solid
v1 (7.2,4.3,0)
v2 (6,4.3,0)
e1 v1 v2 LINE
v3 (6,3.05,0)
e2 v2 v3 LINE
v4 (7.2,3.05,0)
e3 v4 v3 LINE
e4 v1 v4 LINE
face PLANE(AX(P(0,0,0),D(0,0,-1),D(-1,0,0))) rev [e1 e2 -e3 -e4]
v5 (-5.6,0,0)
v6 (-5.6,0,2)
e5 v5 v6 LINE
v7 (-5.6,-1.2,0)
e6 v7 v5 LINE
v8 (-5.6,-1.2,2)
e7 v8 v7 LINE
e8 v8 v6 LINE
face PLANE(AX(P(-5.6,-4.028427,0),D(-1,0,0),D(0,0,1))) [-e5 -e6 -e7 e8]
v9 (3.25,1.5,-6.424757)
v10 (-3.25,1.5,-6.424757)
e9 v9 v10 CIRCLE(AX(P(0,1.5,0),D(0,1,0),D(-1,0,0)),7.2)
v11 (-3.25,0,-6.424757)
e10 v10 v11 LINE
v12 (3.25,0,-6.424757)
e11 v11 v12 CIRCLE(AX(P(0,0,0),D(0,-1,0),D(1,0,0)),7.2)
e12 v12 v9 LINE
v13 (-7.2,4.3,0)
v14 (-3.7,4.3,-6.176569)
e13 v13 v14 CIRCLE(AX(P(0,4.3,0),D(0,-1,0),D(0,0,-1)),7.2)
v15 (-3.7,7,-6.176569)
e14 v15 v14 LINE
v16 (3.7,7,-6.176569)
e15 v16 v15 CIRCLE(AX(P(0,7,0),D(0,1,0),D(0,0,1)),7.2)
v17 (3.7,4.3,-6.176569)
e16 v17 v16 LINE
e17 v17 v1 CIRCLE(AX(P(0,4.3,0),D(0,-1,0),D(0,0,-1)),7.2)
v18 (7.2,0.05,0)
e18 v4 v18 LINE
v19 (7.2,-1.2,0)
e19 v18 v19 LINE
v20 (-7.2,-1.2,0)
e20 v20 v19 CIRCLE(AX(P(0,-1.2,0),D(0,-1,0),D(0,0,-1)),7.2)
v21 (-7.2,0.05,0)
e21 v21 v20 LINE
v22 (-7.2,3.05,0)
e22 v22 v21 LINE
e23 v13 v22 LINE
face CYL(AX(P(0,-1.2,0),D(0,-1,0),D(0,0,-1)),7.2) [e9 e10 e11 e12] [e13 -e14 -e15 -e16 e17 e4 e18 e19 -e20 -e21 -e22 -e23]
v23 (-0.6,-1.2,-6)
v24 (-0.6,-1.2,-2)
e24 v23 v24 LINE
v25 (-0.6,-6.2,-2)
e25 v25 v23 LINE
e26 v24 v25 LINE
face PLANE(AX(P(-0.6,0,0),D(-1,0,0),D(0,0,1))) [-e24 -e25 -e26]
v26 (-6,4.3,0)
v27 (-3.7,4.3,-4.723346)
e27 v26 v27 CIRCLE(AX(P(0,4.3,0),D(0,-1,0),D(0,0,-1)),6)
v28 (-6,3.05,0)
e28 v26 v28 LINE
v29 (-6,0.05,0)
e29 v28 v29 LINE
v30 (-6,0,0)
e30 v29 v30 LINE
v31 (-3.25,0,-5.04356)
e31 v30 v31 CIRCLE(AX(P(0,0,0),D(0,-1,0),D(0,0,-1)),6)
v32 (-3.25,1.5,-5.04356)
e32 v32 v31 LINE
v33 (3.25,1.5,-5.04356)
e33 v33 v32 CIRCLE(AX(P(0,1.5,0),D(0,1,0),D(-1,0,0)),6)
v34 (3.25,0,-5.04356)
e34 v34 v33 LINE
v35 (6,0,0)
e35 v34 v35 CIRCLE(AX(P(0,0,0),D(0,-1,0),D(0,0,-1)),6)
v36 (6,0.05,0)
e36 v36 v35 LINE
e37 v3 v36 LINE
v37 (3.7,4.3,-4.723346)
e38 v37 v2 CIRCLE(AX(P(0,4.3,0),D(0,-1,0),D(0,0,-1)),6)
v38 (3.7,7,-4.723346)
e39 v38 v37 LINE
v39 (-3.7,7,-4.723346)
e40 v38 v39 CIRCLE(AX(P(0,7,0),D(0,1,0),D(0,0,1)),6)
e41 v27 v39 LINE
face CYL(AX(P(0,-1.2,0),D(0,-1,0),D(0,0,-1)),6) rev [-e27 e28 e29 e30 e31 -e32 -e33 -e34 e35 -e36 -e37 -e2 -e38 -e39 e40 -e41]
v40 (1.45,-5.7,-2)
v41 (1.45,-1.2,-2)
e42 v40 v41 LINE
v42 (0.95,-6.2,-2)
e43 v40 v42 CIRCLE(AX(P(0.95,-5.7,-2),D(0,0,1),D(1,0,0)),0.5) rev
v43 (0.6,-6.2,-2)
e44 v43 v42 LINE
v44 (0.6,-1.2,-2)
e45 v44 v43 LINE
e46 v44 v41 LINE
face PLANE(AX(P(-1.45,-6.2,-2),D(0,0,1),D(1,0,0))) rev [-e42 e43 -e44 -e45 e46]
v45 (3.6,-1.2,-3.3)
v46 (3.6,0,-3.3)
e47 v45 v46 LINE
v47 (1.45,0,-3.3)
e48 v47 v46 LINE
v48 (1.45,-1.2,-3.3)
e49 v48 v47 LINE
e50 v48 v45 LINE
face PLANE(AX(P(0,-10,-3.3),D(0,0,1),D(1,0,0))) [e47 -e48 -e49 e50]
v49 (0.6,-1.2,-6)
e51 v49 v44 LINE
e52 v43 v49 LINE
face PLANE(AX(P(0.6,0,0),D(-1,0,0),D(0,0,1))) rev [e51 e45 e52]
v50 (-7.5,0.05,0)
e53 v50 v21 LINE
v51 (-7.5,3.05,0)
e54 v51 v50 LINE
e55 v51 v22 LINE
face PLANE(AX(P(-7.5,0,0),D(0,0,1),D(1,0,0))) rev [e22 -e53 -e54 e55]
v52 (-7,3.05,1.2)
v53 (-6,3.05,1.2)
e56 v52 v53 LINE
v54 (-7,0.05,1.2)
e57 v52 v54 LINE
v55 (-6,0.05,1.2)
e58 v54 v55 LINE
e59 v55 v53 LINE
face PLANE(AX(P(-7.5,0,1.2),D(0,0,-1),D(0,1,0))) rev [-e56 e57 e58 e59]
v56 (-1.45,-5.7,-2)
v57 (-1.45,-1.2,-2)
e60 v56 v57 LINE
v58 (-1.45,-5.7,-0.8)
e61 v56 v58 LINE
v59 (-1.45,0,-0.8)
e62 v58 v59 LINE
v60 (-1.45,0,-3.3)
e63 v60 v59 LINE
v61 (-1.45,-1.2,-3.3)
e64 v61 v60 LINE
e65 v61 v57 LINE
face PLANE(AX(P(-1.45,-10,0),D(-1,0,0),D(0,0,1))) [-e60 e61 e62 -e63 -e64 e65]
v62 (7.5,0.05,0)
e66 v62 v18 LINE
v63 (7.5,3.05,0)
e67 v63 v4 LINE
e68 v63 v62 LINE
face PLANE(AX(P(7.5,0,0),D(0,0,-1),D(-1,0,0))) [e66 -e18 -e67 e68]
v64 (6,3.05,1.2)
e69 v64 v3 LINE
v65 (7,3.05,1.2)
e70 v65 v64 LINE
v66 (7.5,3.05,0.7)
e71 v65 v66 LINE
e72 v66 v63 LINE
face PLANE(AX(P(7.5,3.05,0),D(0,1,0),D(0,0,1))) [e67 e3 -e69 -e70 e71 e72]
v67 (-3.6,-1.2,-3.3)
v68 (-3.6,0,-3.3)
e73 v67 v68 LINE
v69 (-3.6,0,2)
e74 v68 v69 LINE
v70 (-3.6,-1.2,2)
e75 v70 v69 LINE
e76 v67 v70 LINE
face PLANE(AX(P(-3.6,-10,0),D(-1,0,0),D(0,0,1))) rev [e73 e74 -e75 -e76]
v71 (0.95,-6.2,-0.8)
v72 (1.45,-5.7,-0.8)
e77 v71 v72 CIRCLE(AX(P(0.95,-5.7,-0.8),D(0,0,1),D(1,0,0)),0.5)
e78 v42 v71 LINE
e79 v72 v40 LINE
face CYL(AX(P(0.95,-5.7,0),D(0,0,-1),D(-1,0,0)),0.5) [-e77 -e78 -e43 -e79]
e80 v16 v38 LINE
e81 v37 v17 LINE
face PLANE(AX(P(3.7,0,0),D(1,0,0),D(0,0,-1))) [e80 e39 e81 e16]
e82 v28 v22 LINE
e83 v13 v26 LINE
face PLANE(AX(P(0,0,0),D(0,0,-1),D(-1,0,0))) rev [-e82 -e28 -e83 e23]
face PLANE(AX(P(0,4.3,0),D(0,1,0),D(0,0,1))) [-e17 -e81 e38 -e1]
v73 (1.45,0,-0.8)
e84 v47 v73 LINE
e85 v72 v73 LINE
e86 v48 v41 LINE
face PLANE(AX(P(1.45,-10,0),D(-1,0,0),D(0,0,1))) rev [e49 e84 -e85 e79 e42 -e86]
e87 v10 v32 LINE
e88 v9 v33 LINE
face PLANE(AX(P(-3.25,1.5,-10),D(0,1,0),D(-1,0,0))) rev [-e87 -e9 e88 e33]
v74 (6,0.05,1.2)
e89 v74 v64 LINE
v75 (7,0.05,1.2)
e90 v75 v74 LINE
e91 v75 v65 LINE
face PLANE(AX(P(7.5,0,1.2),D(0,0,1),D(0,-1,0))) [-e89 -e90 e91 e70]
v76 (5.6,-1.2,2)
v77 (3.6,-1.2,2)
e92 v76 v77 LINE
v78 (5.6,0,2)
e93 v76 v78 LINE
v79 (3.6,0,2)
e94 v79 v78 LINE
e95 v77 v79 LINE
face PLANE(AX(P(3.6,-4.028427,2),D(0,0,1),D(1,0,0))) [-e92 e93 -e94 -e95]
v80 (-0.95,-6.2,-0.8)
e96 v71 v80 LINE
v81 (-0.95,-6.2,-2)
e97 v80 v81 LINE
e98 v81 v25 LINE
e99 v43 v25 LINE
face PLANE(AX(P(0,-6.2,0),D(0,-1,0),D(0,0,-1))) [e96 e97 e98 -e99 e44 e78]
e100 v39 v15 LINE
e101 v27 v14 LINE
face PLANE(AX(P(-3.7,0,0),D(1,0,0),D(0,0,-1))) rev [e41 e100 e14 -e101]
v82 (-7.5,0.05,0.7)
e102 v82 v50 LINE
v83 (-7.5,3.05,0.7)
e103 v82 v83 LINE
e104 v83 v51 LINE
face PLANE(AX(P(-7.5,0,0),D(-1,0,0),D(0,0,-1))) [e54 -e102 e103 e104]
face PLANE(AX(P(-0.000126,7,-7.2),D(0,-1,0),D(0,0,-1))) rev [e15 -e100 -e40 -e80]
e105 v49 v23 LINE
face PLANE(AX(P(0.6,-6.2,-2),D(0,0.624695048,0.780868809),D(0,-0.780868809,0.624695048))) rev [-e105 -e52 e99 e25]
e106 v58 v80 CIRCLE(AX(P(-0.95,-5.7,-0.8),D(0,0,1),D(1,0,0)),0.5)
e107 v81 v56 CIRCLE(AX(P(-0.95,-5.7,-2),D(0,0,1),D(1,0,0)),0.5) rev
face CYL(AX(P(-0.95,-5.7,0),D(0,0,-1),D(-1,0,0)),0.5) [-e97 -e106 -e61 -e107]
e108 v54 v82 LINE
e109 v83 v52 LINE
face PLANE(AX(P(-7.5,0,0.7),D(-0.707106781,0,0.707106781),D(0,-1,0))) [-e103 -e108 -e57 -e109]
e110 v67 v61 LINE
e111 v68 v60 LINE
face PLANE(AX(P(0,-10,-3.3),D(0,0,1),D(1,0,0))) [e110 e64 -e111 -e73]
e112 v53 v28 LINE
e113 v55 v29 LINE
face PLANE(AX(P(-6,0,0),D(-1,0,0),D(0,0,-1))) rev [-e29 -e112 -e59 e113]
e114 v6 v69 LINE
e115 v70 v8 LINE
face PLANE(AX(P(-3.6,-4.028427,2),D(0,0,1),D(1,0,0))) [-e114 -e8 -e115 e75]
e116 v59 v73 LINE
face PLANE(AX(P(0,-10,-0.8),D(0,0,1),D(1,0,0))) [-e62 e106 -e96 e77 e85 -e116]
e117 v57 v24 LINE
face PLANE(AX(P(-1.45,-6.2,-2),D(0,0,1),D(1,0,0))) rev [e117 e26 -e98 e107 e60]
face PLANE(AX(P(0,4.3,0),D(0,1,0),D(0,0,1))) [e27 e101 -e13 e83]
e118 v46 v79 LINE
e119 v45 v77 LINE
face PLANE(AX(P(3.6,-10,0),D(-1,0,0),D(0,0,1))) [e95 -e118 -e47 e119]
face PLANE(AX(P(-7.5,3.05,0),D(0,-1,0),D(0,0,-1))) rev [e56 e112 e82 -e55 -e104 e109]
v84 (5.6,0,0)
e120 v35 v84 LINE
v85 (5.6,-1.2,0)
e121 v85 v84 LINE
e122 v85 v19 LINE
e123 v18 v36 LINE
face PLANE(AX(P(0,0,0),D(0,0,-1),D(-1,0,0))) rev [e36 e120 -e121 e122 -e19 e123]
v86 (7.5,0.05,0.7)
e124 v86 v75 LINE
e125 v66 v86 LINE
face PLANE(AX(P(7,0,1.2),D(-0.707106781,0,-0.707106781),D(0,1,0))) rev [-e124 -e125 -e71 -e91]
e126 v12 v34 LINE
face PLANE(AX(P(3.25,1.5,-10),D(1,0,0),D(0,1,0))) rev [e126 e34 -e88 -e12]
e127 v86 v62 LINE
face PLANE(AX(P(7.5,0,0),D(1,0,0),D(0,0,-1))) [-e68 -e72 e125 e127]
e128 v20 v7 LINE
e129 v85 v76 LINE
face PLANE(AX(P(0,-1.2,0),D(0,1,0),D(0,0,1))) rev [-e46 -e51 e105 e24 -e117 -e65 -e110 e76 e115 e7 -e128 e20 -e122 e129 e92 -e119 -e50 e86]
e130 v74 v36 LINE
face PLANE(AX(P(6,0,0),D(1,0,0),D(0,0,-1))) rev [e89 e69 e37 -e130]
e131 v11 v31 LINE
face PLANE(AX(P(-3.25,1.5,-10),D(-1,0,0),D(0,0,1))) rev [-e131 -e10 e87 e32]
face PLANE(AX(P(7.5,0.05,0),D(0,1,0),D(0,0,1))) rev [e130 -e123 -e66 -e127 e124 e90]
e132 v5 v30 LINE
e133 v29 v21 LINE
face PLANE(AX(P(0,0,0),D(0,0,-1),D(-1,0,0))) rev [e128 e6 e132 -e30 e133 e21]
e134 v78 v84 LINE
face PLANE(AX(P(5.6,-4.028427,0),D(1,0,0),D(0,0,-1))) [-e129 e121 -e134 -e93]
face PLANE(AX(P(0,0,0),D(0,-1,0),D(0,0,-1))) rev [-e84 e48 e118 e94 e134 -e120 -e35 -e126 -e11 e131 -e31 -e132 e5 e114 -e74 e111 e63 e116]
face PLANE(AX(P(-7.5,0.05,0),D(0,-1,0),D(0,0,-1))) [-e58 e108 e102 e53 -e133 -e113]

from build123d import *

# Parameters (mm, degrees)
SKETCH1_W                = 6
SKETCH1_H                = 1.2
SKETCH1_W_2              = 1.2
SKETCH1_H_2              = 4.3
REVOLVE1_ANGLE           = 180
REVOLVE2_START           = 4.3
REVOLVE2_DEPTH           = 2.7
SKETCH3_W                = 6.5
SKETCH3_H                = 1.5
CUT_EXTRUDE1_DEPTH       = 10
CUT_EXTRUDE2_DEPTH       = 10
SKETCH5_W                = 2
SKETCH5_H                = 2
BOSS_EXTRUDE1_DEPTH      = 1.2
SKETCH6_W                = 1.2
SKETCH6_H                = 3
BOSS_EXTRUDE2_DEPTH      = 1.5
CHAMFER1_SIZE            = 0.5
CHAMFER1_OF_MIRROR1_SIZE = 0.5
SKETCH7_W                = 2.9
SKETCH7_H                = 1.2
BOSS_EXTRUDE3_DEPTH      = 5
BOSS_EXTRUDE4_DEPTH      = 0.6
FILLET1_R                = 0.5


# Read off the part's stored shape, not the designer's step: Revolve2
with BuildPart() as part:
    # Sketch1 → Revolve1 (revolve)
    with BuildSketch(Plane.XY):
        with Locations((3, -0.6)):
            Rectangle(SKETCH1_W, SKETCH1_H)
        with Locations((6.6, -0.6)):
            Rectangle(SKETCH1_W_2, SKETCH1_H)
        with Locations((6.6, 2.15)):
            Rectangle(SKETCH1_W_2, SKETCH1_H_2)
    revolve(axis=Axis((0, -1.2, 0), (0, 1, 0)), revolution_arc=REVOLVE1_ANGLE)

    # Revolve2 outline → Revolve2 (add)
    with BuildSketch(Plane(origin=(0, 0, 0), x_dir=(1, 0, 0), z_dir=(0, 1, 0)).offset(REVOLVE2_START)):
        with BuildLine():
            ThreePointArc((3.7, 6.176568627), (0, 7.2), (-3.7, 6.176568627))
            Line((-3.7, 6.176568627), (-3.7, 4.723346271))
            ThreePointArc((-3.7, 4.723346271), (0, 6), (3.7, 4.723346271))
            Line((3.7, 4.723346271), (3.7, 6.176568627))
        make_face()
    extrude(amount=REVOLVE2_DEPTH)

    # Sketch3 → Cut-Extrude1 (cut)
    with BuildSketch(Plane.XY):
        with Locations((0, 0.75)):
            Rectangle(SKETCH3_W, SKETCH3_H)
    extrude(amount=-CUT_EXTRUDE1_DEPTH, mode=Mode.SUBTRACT)

    # Sketch4 → Cut-Extrude2 (cut)
    with BuildSketch(Plane(origin=(0, 0, 0), x_dir=(1, 0, 0), z_dir=(0, 1, 0))):
        Polygon((-1.45, 3.3), (-3.6, 3.3), (-3.6, 0), (3.6, 0), (3.6, 3.3), (1.45, 3.3), (1.45, 0.8), (-1.45, 0.8), align=None)
    extrude(amount=-CUT_EXTRUDE2_DEPTH, mode=Mode.SUBTRACT)

    # Sketch5 → Boss-Extrude1 (add)
    with BuildSketch(Plane(origin=(0, 0, 0), x_dir=(1, 0, 0), z_dir=(0, 1, 0))):
        with Locations((-4.6, -1)):
            Rectangle(SKETCH5_W, SKETCH5_H)
        with Locations((4.6, -1)):
            Rectangle(SKETCH5_W, SKETCH5_H)
    extrude(amount=-BOSS_EXTRUDE1_DEPTH)

    # Sketch6 → Boss-Extrude2 (add)
    with BuildSketch(Plane(origin=(6, 0, 0), x_dir=(0, 0, -1), z_dir=(1, 0, 0))):
        with Locations((-0.6, 1.55)):
            Rectangle(SKETCH6_W, SKETCH6_H)
    boss_extrude2 = extrude(amount=BOSS_EXTRUDE2_DEPTH)

    # Chamfer1
    chamfer1_edges = [part.edges().sort_by_distance(p)[0] for p in [
        (7.5, 1.55, 1.2),
    ]]
    chamfer(chamfer1_edges, length=CHAMFER1_SIZE)

    # Mirror1: Boss-Extrude2 across plane
    add(boss_extrude2.mirror(Plane(origin=(0, 0, 0), x_dir=(0, 0, 1), z_dir=(1, 0, 0))))

    # Chamfer1 of Mirror1
    chamfer1_of_mirror1_edges = [part.edges().sort_by_distance(p)[0] for p in [
        (-7.5, 1.55, 1.2),
    ]]
    chamfer(chamfer1_of_mirror1_edges, length=CHAMFER1_OF_MIRROR1_SIZE)

    # Sketch7 → Boss-Extrude3 (add)
    with BuildSketch(Plane.XZ.offset(1.2)):
        with Locations((0, -1.4)):
            Rectangle(SKETCH7_W, SKETCH7_H)
    extrude(amount=BOSS_EXTRUDE3_DEPTH)

    # Sketch8 → Boss-Extrude4 (add, symmetric)
    with BuildSketch(Plane(origin=(0, 0, 0), x_dir=(0, 0, -1), z_dir=(1, 0, 0))):
        Polygon((2, -6.2), (6, -1.2), (2, -1.2), align=None)
    extrude(amount=BOSS_EXTRUDE4_DEPTH, both=True)

    # Fillet1
    fillet1_edges = [part.edges().sort_by_distance(p)[0] for p in [
        (-1.45, -6.2, -1.4),
        (1.45, -6.2, -1.4),
    ]]
    fillet(fillet1_edges, radius=FILLET1_R)


solid = part.part
